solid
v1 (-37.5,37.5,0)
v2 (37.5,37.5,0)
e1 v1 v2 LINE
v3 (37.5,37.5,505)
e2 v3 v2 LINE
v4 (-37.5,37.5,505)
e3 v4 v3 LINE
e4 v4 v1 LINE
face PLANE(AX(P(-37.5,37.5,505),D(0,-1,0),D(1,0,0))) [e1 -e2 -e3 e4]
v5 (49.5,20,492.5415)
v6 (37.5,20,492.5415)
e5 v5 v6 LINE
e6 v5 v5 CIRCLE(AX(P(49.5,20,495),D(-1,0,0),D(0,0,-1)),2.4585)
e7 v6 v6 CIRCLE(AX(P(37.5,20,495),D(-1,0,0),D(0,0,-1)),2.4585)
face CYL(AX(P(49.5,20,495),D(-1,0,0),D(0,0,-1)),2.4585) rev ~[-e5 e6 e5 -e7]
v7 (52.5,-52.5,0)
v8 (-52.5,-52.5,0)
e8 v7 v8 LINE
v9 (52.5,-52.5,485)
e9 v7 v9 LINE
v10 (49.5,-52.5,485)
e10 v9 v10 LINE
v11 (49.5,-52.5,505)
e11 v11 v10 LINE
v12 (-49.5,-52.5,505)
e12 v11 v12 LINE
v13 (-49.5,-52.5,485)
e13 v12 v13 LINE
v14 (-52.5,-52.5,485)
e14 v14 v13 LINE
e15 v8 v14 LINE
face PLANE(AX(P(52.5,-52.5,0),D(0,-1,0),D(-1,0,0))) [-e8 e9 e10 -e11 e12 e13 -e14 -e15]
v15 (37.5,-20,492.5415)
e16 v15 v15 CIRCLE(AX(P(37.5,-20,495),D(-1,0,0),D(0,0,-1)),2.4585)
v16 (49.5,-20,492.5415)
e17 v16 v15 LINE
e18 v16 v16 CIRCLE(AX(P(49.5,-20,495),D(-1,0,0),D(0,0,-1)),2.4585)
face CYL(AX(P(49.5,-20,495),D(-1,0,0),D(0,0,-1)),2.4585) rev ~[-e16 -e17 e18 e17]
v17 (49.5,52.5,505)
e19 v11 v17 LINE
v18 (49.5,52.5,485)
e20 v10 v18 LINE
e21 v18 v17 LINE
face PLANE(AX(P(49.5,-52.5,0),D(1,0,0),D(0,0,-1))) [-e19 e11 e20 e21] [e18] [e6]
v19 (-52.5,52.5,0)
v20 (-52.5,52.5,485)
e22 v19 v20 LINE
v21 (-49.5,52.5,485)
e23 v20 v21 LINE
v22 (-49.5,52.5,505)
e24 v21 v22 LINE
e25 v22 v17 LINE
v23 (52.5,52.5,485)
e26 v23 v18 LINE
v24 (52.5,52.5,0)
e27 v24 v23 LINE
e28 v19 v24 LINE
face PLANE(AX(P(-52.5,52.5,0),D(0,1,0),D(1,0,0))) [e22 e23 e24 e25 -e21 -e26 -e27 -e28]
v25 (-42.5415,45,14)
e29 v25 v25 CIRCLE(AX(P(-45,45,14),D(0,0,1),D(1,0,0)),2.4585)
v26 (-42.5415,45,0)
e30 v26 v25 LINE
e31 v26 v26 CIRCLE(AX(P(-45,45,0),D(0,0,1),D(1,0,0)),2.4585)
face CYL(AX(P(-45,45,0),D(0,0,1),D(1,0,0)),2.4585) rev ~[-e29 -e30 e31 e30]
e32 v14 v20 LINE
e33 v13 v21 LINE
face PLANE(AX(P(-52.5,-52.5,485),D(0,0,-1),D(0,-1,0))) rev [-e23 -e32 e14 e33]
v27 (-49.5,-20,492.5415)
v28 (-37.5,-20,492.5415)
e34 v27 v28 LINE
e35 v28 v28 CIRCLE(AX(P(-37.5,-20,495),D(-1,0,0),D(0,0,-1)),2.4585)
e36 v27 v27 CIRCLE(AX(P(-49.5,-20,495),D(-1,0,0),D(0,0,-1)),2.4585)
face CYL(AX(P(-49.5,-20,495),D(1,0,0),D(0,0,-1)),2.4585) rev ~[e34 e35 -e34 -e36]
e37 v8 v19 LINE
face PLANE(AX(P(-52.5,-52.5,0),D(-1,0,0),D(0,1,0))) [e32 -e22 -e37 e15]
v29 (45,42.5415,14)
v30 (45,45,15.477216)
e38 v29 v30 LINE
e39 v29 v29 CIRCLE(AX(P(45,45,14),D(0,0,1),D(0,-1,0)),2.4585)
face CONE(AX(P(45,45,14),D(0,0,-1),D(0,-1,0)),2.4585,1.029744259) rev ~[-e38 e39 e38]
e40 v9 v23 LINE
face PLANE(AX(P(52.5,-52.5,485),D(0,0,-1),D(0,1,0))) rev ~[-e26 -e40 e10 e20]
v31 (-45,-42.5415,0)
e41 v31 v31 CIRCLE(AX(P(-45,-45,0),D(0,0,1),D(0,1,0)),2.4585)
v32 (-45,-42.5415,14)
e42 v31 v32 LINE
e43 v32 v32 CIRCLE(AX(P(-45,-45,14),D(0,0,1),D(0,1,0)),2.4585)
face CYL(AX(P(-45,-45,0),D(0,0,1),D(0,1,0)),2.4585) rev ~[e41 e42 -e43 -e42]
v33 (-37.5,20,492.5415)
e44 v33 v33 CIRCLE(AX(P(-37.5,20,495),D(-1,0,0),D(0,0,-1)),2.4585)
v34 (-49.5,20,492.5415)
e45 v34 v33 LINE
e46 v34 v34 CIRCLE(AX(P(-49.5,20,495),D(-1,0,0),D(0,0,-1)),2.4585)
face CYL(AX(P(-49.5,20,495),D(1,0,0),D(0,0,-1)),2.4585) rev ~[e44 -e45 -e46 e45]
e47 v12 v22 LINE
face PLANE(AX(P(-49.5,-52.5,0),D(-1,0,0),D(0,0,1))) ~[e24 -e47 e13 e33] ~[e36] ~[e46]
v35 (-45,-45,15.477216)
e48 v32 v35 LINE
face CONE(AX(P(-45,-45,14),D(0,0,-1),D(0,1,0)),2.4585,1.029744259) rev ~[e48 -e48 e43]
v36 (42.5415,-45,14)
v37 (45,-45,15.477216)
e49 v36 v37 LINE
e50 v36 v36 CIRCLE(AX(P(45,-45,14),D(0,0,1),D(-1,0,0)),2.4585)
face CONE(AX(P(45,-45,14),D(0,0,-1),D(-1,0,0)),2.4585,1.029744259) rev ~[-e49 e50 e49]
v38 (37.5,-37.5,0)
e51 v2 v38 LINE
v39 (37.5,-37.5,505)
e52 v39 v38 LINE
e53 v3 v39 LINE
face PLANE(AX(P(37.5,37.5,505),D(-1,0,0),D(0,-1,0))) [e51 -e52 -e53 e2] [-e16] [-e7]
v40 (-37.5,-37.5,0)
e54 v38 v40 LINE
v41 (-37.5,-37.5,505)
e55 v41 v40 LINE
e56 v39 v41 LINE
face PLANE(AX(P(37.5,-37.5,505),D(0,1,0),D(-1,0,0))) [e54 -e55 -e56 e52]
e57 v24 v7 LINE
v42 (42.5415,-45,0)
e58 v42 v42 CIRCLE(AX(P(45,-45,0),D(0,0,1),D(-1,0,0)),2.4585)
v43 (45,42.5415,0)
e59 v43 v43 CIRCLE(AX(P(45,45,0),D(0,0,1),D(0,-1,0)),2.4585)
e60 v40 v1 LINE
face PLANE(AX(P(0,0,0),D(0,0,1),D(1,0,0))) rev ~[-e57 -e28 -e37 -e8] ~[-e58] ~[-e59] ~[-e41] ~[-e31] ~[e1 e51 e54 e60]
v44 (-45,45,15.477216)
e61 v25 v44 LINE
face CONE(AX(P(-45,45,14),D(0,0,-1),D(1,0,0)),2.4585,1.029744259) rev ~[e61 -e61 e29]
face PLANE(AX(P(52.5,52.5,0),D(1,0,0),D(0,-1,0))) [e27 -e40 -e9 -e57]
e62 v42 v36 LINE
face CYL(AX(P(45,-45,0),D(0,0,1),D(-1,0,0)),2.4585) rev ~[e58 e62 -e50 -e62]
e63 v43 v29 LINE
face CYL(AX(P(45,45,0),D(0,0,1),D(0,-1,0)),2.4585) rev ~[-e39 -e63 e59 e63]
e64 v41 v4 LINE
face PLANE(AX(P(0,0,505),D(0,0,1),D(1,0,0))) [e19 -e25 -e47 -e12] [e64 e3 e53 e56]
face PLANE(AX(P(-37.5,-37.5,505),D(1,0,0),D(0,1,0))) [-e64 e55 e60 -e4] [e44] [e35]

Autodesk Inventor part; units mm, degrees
ref_plane "YZ Plane" through (0, 0, 0) normal (1, 0, 0) x (0, 1, 0)
ref_plane "XZ Plane" through (0, 0, 0) normal (0, 1, 0) x (-1, 0, 0)
ref_plane "XY Plane" through (0, 0, 0) normal (0, 0, 1) x (1, 0, 0)
sketch "Skizze1" plane through (0, 0, 0) normal (0, 0, 1) x (1, 0, 0)
  line L0 (-52.5, 52.5) -> (52.5, 52.5)
  line L1 (52.5, 52.5) -> (52.5, -52.5)
  line L2 (52.5, -52.5) -> (-52.5, -52.5)
  line L3 (-52.5, -52.5) -> (-52.5, 52.5)
  line L4 (-52.5, 52.5) -> (52.5, -52.5) construction
  line L5 (52.5, 52.5) -> (-52.5, -52.5) construction
  point P0 (0, 0)
  dimension "d0" = 105
  dimension "d1" = 105
extrude "Extrusion1" add sketch "Skizze1" along normal blind 505
sketch "Skizze2" plane through (0, 0, 505) normal (0, 0, 1) x (1, 0, 0)
  spline S0 degree 3 poles (30.8941, -22.3608) (33.2455, -20.1357) (33.4278, -16.4642) (34.1009, -12.3897) (34.4408, -6.5615) (32.3239, 0.3889) (27.6464, 2.563) (18.7777, 8.3579) (6.0522, 19.3643) (-10.5838, 24.0919) (-22.9306, 22.7109) (-28.1368, 17.5955) (-28.9312, 16.6042) knots 0 0 0 0 0.05535 0.076528 0.211782 0.295547 0.382964 0.432922 0.754884 0.81234 0.967238 1 1 1 1
  spline S1 degree 3 poles (-28.9312, 16.6042) (-32.363, 12.3217) (-33.922, 4.96) (-34.2212, -5.2183) (-33.7128, -11.7973) (-30.1787, -16.4552) (-26.4199, -18.3019) (-21.7499, -13.8164) (-22.8916, -9.4321) (-23.5075, -1.7153) (-24.1566, 7.4044) (-16.6489, 14.0721) (-3.6681, 12.4997) (3.1986, 4.5284) (3.2907, 1.6248) (4.5253, 0.0908) (6.4773, -0.7371) (8.3789, 1.0013) (13.1845, -1.004) (13.6371, -9.218) (17.043, -16.25) (23.1831, -17.8066) (25.3482, -18.6226) (26.133, -19.8789) (26.5745, -22.0211) (27.7048, -23.641) (30.0236, -23.1574) (30.8172, -22.4336) (30.8941, -22.3608) knots 0 0 0 0 0.14153 0.17035 0.245987 0.25892 0.290227 0.326265 0.372233 0.38898 0.482096 0.508256 0.624416 0.647418 0.715274 0.72607 0.746892 0.801722 0.811885 0.848514 0.916356 0.943374 0.948219 0.962959 0.96651 0.98188 0.998188 1 1 1 1
  arc A0 (27.4787, -6.7498) -> (23.9934, -5.2356) centre (25, -7.687) ccw
  line L0 (27.4787, -6.7498) -> (26.0066, -10.1384)
  arc A1 (22.5213, -8.6242) -> (26.0066, -10.1384) centre (25, -7.687) ccw
  line L1 (22.5213, -8.6242) -> (23.9934, -5.2356)
  line L2 (22.5213, -8.6242) -> (23.9934, -5.2356)
  arc A2 (22.5213, -8.6242) -> (26.0066, -10.1384) centre (25, -7.687) ccw
  line L3 (27.4787, -6.7498) -> (26.0066, -10.1384)
  arc A3 (27.4787, -6.7498) -> (23.9934, -5.2356) centre (25, -7.687) ccw
  line L4 (-52.5, 52.5) -> (-52.5, -52.5) construction
  line L5 (-52.5, 0) -> (52.5, 0) construction
  line L6 (52.5, -52.5) -> (52.5, 52.5) construction
  line L7 (-34.1215, 23.4036) -> (-34.1215, -17.2518) construction
  line L8 (34.1216, 27.1841) -> (34.1216, -29.8621) construction
  line L9 (-36.6715, 23.259) -> (37.4151, 23.259) construction
  line L10 (-34.1215, -23.2592) -> (37.4151, -23.2592) construction
  point P0 (0, 0)
  point P1 (0, 0)
  dimension "d4" = 34.1215
  dimension "d6" = 34.1216
  dimension "d10" = 23.259
  dimension "d11" = 23.2592
extrude "Extrusion2" cut sketch "Skizze2" against normal blind 505 contours S1 S0 | L0 A1 L1 A0
sketch "Skizze5" plane through (0, 0, 505) normal (0, 0, 1) x (1, 0, 0)
  line L0 (-37.5, 37.5) -> (37.5, 37.5)
  line L1 (37.5, 37.5) -> (37.5, -37.5)
  line L2 (37.5, -37.5) -> (-37.5, -37.5)
  line L3 (-37.5, -37.5) -> (-37.5, 37.5)
  line L4 (-37.5, 37.5) -> (37.5, -37.5) construction
  line L5 (37.5, 37.5) -> (-37.5, -37.5) construction
  spline S0 degree 3 poles (-28.9312, 16.6042) (-28.1368, 17.5955) (-22.9306, 22.7109) (-10.5838, 24.0919) (6.0522, 19.3643) (18.7777, 8.3579) (27.6464, 2.563) (32.3239, 0.3889) (34.4408, -6.5615) (34.1009, -12.3897) (33.4278, -16.4642) (33.2455, -20.1357) (30.8941, -22.3608) knots 0 0 0 0 0.032762 0.18766 0.245116 0.567078 0.617036 0.704453 0.788218 0.923472 0.94465 1 1 1 1
  spline S1 degree 3 poles (30.8941, -22.3608) (30.8172, -22.4336) (30.0236, -23.1574) (27.7048, -23.641) (26.5745, -22.0211) (26.133, -19.8789) (25.3482, -18.6226) (23.1831, -17.8066) (17.043, -16.25) (13.6371, -9.218) (13.1845, -1.004) (8.3789, 1.0013) (6.4773, -0.7371) (4.5253, 0.0908) (3.2907, 1.6248) (3.1986, 4.5284) (-3.6681, 12.4997) (-16.6489, 14.0721) (-24.1566, 7.4044) (-23.5075, -1.7153) (-22.8916, -9.4321) (-21.7499, -13.8164) (-26.4199, -18.3019) (-30.1787, -16.4552) (-33.7128, -11.7973) (-34.2212, -5.2183) (-33.922, 4.96) (-32.363, 12.3217) (-28.9312, 16.6042) knots 0 0 0 0 0.001812 0.01812 0.03349 0.037041 0.051781 0.056626 0.083644 0.151486 0.188115 0.198278 0.253108 0.27393 0.284726 0.352582 0.375584 0.491744 0.517904 0.61102 0.627767 0.673735 0.709773 0.74108 0.754013 0.82965 0.85847 1 1 1 1
  point P0 (0, 0)
  dimension "d18" = 75
  dimension "d19" = 75
extrude "Extrusion3" cut sketch "Skizze5" against normal blind 505
sketch "Skizze8" plane through (52.5, -52.5, 0) normal (1, 0, 0) x (0, 0, -1)
  line L0 (-505, 0) -> (-505, 105) projected
  line L1 (0, 105) -> (-505, 105) projected
  line L2 (-505, 0) -> (-485, 0)
  line L3 (-485, 0) -> (-485, 105)
  line L4 (-485, 105) -> (-505, 105)
  line L5 (-505, 105) -> (-505, 0)
  point P0 (0, 52.5)
  dimension "d33" = 20
extrude "Extrusion5" cut sketch "Skizze8" against normal blind 3
mirror "Spiegeln2" about plane through (0, 0, 0) normal (1, 0, 0) of "Extrusion5"
sketch "Skizze9" plane through (49.5, -52.5, 0) normal (1, 0, 0) x (0, 0, -1)
  line L0 (-505, 0) -> (-505, 105) projected
  line L1 (-505, 105) -> (-485, 105) projected
  point P0 (0, 52.5)
  point P1 (-495, 32.5)
  point P2 (-495, 72.5)
  dimension "d36" = 10
  dimension "d37" = 40
  dimension "d38" = 32.5
hole "Bohrung2" at (49.5, -20, 495) at (49.5, 20, 495) direction (-1, 0, 0) diameter 4.917 depth 12 thread size "M6x1" class "6H" standard "ISO Metric profile"
mirror "Spiegeln3" about plane through (0, 0, 0) normal (1, 0, 0) of "Bohrung2"
sketch "Skizze11" plane through (0, 0, 0) normal (0, 0, -1) x (-1, 0, 0)
  line L0 (52.5, 52.5) -> (52.5, -52.5) projected
  line L1 (52.5, -52.5) -> (-52.5, -52.5) projected
  point P0 (0, 0)
  point P1 (45, -45)
  dimension "d46" = 7.5
  dimension "d47" = 7.5
hole "Bohrung3" at (-45, -45, 0) direction (0, 0, 1) diameter 4.917 depth 14 tip angle 118 thread size "M6x1" class "6H" standard "ISO Metric profile"
pattern_circular "Runde Anordnung1" count 4 over 360 about axis through (0, 0, -10) along (0, 0, 1) of "Bohrung3"
equation "\"d0\" = Magazin_Laenge"
equation "\"d1\" = Magazin_Breite"
equation "\"d2\" = Magazin_Hoehe"
equation "\"d12\" = Magazin_Hoehe"
equation "\"d18\" = Magazin_Breite - 2 * Wanddicke"
equation "\"d19\" = Magazin_Laenge - 2 * Wanddicke"
equation "\"d20\" = Magazin_Hoehe"
equation "\"d33\" = oberer_Absatz"
equation "\"d36\" = Bohrungsversatz_oben"
equation "\"d37\" = Bohrungsabstand_oben"
equation "\"d38\" = 0.5 * Magazin_Breite - 0.5 * Bohrungsabstand_oben"
equation "\"d46\" = 0.5 * Wanddicke"
equation "\"d47\" = d46"
equation "\"Magazin_Hoehe\" = 505"
equation "\"Magazin_Laenge\" = Magazin_Breite"
equation "\"Wanddicke\" = 15"
equation "\"Bohrungsversatz_oben\" = 10"
equation "\"Bohrungsabstand_oben\" = 40"
equation "\"oberer_Absatz\" = 20"
equation "\"Magazin_Breite\" = 105"
properties part number "TS_Magazin_int"
